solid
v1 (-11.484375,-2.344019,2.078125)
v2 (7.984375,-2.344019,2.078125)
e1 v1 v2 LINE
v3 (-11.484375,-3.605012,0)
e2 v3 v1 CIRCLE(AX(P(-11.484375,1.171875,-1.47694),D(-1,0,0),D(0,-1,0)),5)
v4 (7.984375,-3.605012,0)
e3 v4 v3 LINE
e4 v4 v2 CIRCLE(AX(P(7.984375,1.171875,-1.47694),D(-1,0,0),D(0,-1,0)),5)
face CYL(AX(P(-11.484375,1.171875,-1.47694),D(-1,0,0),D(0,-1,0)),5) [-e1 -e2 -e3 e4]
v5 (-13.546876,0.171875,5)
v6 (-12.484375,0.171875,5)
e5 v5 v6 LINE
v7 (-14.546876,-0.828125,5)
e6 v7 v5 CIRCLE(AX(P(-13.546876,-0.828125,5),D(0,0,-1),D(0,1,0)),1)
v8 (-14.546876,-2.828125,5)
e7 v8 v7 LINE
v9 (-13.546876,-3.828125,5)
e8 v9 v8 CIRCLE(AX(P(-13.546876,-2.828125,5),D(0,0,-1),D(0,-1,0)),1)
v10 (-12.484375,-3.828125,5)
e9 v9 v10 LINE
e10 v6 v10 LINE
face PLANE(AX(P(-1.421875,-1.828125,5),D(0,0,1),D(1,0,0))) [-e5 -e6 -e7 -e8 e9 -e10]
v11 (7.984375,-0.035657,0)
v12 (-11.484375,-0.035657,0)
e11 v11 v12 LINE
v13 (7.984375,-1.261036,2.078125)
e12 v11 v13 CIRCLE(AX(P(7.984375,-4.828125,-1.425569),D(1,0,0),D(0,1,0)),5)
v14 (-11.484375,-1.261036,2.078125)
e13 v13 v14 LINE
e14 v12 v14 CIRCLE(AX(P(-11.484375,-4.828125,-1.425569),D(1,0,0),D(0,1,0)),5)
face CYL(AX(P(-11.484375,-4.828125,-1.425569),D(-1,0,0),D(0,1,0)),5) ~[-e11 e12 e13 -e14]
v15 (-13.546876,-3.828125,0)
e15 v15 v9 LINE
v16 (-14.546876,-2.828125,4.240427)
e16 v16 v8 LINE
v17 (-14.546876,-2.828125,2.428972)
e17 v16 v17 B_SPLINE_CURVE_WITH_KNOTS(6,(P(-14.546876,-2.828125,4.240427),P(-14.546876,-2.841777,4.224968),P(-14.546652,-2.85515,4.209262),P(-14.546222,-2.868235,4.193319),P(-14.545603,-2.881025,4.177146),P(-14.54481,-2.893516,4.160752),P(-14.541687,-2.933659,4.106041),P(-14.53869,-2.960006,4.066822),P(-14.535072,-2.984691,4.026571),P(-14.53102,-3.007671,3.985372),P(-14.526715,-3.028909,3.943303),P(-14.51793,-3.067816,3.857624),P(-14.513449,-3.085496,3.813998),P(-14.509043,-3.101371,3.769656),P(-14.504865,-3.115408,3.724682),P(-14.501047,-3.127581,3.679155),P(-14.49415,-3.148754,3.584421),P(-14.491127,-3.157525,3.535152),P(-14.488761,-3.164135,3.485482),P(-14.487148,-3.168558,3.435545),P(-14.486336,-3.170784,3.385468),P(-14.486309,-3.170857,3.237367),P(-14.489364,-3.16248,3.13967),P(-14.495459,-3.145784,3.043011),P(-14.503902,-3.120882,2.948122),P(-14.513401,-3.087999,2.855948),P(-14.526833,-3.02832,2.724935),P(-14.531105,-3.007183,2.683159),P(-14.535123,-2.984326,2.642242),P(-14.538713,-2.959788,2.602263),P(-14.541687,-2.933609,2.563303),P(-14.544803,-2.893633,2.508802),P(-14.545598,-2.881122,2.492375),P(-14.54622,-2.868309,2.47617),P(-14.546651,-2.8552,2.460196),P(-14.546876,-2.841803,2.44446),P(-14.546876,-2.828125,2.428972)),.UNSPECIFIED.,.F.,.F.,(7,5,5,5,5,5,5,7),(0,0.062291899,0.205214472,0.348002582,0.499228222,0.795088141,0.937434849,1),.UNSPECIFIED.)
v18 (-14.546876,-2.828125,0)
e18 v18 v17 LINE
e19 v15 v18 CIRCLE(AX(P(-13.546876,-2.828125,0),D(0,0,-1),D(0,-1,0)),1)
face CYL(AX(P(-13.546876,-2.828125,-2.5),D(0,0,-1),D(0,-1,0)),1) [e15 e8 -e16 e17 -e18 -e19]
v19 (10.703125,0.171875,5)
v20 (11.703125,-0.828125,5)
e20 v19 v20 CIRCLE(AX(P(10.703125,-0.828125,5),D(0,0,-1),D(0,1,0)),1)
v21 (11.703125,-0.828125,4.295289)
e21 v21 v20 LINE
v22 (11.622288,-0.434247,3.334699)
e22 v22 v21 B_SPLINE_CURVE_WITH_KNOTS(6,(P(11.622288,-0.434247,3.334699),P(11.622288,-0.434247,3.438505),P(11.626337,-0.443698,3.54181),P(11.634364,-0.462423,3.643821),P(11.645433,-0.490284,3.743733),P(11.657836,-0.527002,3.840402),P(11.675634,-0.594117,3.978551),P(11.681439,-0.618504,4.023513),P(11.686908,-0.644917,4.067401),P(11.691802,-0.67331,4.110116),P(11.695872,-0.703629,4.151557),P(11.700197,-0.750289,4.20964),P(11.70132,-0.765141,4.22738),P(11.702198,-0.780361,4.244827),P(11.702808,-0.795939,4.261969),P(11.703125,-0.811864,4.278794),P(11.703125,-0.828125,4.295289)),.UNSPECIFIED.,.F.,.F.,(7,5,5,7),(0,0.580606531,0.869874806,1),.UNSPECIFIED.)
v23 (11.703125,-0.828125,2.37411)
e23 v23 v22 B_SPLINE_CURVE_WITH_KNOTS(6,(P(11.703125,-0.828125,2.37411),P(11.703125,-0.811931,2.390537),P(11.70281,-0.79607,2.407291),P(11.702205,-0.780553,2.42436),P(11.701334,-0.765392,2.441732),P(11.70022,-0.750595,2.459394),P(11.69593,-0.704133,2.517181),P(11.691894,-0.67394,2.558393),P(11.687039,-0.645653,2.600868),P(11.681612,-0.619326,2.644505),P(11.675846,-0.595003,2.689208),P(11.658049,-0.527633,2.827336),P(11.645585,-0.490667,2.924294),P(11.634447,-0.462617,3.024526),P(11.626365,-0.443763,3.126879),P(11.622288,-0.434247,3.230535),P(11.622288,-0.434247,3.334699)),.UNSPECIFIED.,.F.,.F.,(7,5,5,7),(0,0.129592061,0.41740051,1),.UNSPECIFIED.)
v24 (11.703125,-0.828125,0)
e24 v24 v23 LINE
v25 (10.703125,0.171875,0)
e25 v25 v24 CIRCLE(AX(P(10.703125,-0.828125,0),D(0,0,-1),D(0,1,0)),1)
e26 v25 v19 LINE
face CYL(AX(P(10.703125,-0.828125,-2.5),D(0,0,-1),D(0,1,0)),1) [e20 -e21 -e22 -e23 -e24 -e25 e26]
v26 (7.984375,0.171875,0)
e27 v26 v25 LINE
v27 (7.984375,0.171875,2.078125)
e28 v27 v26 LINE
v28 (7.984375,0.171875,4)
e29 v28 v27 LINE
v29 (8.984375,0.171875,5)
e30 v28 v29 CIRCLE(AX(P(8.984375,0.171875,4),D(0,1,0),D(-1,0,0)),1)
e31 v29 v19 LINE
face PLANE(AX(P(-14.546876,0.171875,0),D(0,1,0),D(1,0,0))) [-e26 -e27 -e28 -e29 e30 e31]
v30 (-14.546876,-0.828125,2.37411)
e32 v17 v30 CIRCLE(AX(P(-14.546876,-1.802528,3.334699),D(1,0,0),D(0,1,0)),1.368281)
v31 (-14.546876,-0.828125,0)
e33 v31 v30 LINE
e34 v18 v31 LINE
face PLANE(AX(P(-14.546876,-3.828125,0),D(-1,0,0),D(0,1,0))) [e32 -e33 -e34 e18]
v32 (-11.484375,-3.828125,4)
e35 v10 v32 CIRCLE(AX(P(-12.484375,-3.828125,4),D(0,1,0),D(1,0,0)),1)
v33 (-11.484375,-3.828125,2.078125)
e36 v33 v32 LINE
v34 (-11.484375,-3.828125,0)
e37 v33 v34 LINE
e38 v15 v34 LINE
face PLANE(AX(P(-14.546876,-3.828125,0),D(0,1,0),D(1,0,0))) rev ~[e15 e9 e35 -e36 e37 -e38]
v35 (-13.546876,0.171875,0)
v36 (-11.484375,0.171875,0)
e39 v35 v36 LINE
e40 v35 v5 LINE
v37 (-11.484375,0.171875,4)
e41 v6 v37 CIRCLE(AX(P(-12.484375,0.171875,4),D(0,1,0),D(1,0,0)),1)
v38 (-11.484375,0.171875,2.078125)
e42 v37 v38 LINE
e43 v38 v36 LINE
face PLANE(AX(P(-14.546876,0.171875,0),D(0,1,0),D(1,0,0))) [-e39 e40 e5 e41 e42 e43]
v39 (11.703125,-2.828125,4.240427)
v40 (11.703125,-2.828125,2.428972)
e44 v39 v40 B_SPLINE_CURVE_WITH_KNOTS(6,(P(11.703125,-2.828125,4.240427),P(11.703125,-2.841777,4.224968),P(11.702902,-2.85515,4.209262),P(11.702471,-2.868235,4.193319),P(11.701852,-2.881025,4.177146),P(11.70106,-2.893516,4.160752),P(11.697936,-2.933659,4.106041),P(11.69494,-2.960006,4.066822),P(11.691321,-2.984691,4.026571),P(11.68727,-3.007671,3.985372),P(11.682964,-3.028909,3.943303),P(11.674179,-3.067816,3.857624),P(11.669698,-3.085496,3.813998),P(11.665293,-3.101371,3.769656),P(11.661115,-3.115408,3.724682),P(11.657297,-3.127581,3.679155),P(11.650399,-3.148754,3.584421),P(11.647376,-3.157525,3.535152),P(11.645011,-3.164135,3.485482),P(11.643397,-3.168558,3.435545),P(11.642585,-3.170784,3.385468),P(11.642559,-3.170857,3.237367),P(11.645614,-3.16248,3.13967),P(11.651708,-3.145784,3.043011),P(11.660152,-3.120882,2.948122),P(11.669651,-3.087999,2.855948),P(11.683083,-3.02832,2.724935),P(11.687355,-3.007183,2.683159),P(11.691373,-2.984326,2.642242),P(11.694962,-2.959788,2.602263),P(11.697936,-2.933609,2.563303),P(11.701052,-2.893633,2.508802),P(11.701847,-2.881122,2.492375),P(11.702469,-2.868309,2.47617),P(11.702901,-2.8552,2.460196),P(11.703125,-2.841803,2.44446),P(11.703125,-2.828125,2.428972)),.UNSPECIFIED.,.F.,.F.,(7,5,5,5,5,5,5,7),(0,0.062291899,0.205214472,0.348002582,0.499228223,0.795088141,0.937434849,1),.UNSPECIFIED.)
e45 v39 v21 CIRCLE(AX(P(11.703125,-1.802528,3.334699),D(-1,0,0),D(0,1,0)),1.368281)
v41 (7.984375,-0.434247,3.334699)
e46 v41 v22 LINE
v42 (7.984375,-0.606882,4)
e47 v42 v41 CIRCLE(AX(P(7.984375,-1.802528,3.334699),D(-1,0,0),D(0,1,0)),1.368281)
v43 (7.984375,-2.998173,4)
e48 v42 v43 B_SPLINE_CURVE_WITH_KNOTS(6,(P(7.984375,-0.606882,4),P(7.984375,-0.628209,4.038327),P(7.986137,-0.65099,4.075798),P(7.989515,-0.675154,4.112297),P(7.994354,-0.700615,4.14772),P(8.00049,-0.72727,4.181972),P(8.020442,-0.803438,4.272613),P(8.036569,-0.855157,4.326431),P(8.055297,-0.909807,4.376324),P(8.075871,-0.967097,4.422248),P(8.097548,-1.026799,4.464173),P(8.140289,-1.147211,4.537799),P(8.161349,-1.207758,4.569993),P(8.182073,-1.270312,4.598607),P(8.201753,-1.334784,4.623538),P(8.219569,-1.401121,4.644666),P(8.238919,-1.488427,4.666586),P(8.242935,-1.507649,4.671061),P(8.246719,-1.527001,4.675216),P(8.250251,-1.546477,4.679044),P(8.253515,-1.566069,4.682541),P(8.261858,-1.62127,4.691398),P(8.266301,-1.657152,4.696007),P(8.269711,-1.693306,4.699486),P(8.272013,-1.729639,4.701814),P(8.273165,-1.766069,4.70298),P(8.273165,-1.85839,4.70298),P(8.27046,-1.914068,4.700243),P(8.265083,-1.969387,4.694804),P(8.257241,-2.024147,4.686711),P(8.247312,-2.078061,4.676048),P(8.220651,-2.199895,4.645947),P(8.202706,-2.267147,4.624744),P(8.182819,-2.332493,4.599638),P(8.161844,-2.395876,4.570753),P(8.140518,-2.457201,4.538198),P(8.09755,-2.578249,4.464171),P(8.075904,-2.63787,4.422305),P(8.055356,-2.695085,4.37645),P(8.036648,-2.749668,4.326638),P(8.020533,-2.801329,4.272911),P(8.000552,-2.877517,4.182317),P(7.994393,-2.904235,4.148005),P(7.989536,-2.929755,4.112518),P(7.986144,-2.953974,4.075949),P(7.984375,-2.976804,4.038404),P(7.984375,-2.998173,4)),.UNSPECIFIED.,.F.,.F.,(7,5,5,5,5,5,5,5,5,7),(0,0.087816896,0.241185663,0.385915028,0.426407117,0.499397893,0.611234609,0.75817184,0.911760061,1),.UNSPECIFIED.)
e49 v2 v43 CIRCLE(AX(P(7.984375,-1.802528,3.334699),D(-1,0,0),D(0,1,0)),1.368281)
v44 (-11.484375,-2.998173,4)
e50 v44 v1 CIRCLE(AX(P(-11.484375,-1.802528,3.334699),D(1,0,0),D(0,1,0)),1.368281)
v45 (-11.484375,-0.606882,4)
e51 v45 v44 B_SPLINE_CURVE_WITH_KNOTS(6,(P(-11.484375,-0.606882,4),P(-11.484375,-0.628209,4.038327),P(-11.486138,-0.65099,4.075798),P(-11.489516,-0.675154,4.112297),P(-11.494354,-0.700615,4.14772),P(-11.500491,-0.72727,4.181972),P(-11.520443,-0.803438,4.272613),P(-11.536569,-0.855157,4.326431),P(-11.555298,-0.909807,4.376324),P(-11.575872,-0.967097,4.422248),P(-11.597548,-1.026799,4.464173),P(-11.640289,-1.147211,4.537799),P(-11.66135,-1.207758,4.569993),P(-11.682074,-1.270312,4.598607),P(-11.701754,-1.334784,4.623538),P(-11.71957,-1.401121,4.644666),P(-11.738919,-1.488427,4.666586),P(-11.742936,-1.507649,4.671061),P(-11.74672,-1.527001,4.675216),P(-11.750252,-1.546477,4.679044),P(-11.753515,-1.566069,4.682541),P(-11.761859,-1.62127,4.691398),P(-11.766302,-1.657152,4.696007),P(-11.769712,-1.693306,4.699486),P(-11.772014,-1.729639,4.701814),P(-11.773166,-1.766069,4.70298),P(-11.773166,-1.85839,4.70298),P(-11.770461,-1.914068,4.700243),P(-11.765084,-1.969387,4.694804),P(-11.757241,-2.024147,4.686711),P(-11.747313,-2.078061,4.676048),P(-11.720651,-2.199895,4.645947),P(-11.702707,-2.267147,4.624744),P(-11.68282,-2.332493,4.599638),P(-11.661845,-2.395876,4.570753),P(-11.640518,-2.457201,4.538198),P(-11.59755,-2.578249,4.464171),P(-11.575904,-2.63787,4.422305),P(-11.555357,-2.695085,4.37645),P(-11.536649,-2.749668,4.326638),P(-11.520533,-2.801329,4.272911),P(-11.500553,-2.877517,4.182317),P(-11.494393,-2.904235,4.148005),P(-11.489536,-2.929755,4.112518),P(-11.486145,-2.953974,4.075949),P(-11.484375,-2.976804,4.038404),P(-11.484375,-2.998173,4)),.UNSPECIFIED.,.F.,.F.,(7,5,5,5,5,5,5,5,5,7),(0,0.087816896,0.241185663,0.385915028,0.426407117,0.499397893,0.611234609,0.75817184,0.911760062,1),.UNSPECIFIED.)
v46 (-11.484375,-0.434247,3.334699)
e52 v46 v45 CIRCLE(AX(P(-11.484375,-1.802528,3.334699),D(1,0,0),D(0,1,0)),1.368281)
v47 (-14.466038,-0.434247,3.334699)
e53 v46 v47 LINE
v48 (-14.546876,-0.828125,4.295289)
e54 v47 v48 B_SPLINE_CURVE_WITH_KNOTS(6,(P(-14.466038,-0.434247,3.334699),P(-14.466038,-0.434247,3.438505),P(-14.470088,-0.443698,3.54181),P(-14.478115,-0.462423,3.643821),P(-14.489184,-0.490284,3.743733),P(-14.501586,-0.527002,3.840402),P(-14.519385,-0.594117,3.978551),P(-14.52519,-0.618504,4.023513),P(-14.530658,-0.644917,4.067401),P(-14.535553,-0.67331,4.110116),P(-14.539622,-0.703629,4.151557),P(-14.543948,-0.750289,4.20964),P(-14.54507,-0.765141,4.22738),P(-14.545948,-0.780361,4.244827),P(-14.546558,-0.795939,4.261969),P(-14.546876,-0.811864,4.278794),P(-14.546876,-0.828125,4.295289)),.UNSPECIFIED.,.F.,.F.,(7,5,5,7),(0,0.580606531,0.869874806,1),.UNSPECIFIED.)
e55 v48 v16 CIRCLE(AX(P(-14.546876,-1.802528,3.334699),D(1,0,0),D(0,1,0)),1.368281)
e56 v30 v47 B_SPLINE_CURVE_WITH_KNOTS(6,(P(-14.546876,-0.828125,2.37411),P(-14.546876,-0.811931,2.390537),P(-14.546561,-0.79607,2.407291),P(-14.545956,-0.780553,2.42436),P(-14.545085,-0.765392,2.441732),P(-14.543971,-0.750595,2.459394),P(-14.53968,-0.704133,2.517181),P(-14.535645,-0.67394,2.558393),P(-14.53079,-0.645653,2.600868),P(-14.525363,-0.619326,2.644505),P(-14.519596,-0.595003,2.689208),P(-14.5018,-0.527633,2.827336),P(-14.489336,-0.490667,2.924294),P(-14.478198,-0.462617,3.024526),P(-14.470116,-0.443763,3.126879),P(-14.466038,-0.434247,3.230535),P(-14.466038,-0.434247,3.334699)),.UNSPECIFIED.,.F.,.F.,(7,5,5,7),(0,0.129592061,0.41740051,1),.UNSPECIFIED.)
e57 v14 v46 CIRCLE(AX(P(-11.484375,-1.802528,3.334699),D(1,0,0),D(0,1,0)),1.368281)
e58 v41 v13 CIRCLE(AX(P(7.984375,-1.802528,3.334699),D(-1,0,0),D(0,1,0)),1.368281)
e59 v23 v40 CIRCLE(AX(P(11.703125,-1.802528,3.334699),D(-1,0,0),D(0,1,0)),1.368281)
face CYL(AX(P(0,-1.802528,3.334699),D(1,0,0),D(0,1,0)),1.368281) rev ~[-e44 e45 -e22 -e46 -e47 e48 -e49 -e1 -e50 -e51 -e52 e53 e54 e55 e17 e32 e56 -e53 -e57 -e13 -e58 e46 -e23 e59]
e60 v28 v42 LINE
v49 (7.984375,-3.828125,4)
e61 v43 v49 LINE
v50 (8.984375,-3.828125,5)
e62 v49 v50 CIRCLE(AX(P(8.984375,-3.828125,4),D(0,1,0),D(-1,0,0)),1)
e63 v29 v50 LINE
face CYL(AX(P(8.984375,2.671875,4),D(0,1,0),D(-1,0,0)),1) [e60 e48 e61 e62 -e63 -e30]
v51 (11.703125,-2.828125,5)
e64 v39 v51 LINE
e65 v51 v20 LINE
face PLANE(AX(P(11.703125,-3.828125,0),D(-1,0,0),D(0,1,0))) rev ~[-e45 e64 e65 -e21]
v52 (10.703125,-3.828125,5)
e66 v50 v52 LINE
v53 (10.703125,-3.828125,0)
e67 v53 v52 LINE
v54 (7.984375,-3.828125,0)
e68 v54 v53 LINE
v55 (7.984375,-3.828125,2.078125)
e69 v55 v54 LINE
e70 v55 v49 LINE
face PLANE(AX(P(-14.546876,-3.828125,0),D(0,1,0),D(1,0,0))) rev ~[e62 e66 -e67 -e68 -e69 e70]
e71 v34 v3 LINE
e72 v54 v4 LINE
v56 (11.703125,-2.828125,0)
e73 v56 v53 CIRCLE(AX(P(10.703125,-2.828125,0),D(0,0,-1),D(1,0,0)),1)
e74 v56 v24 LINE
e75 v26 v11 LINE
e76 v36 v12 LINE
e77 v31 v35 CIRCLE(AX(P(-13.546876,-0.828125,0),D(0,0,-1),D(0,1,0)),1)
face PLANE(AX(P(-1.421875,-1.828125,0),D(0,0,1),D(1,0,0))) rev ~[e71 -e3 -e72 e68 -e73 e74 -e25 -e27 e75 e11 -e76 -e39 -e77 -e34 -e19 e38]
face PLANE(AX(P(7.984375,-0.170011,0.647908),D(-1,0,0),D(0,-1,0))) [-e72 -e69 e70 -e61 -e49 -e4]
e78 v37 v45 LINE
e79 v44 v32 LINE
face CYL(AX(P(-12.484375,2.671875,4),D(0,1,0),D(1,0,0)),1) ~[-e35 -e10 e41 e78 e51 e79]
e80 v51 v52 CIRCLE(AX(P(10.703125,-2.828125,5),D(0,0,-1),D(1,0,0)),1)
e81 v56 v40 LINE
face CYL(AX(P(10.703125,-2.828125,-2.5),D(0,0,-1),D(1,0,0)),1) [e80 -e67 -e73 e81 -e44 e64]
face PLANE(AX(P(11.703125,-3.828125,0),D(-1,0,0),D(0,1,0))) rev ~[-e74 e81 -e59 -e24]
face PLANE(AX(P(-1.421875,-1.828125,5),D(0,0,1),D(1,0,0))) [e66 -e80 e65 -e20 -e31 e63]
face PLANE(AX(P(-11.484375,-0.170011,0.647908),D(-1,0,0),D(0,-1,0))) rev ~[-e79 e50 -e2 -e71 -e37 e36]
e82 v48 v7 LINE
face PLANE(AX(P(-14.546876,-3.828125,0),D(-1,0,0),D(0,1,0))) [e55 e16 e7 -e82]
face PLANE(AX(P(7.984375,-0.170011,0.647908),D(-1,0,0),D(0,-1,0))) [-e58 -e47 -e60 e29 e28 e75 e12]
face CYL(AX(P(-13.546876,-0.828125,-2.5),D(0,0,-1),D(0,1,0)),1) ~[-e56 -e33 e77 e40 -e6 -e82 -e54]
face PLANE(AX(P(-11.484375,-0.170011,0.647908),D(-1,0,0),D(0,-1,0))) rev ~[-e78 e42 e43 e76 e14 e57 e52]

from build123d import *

# Parameters (mm, degrees)
F0_W         = 26.2500010431
F0_H         = 4
F1_DEPTH     = 5
F2_W         = 19.4687498733
F2_H         = 4.5937502291
F3_DEPTH     = 43.3
F4_DEPTH     = 52.6
F5_R         = 1.3682808459
F6_DEPTH     = 25
F7_DEPTH     = 21.1
F8_T1_DEPTH  = 10
F9_T1_DEPTH  = 10
F10_T1_DEPTH = 10
F11_T1_DEPTH = 19.4687498733
F12_T1_DEPTH = 9


# Not quite as in the source:
# - a fillet or chamfer that OpenCascade refuses, or shapes differently, is made with other operations: its cross-section is extruded or revolved along the edge and cut away or added


with BuildPart() as f1:
    # F0 (on Top) → F1 (new body)
    with BuildSketch(Plane.XY):
        with Locations((-1.4218753204, -1.8281253073)):
            Rectangle(F0_W, F0_H)
    extrude(amount=F1_DEPTH)

    # F2 (on Front) → F3 (cut)
    with BuildSketch(Plane.XZ):
        with Locations((-1.7500002868, 4.375000135)):
            Rectangle(F2_W, F2_H)
    extrude(amount=F3_DEPTH, mode=Mode.SUBTRACT)

    # F2 (on Front) → F4 (cut)
    with BuildSketch(Plane.XZ):
        with Locations((-1.7500002868, 4.375000135)):
            Rectangle(F2_W, F2_H)
    extrude(amount=-F4_DEPTH, mode=Mode.SUBTRACT)

    # F5 (on Right) → F6 (cut)
    with BuildSketch(Plane.YZ):
        with Locations((-1.802527695, 3.3346994314)):
            Circle(F5_R)
    extrude(amount=-F6_DEPTH, mode=Mode.SUBTRACT)

    # F5 (on Right) → F7 (cut)
    with BuildSketch(Plane.YZ):
        with Locations((-1.802527695, 3.3346994314)):
            Circle(F5_R)
    extrude(amount=F7_DEPTH, mode=Mode.SUBTRACT)

    # F8: fillet of radius 1 on 1 edges, made by hand

    # F8_s2 → F8_t1 (cut)
    with BuildSketch(Plane.XY.offset(-2.5)):
        with BuildLine():
            ThreePointArc((10.7031252012, 0.1718746927), (11.4102319824, -0.1210185261), (11.7031252012, -0.8281253073))
            Line((11.7031252012, -0.8281253073), (11.7031252012, 0.1718746927))
            Line((11.7031252012, 0.1718746927), (10.7031252012, 0.1718746927))
        make_face()
    extrude(amount=F8_T1_DEPTH, mode=Mode.SUBTRACT)

    # F9: fillet of radius 1 on 1 edges, made by hand

    # F9_s2 → F9_t1 (cut)
    with BuildSketch(Plane.XY.offset(-2.5)):
        with BuildLine():
            ThreePointArc((-13.5468758419, 0.1718746927), (-14.2539826231, -0.1210185261), (-14.5468758419, -0.8281253073))
            Line((-14.5468758419, -0.8281253073), (-14.5468758419, 0.1718746927))
            Line((-14.5468758419, 0.1718746927), (-13.5468758419, 0.1718746927))
        make_face()
    extrude(amount=F9_T1_DEPTH, mode=Mode.SUBTRACT)

    # F10: fillet of radius 1 on 2 edges, made by hand

    # F10_s2 → F10_t1 (cut)
    with BuildSketch(Plane.XY.offset(-2.5)):
        with BuildLine():
            ThreePointArc((11.7031252012, -2.8281253073), (11.4102319824, -3.5352320885), (10.7031252012, -3.8281253073))
            Line((10.7031252012, -3.8281253073), (11.7031252012, -3.8281253073))
            Line((11.7031252012, -3.8281253073), (11.7031252012, -2.8281253073))
        make_face()
        with BuildLine():
            ThreePointArc((-13.5468758419, -3.8281253073), (-14.2539826231, -3.5352320885), (-14.5468758419, -2.8281253073))
            Line((-14.5468758419, -2.8281253073), (-14.5468758419, -3.8281253073))
            Line((-14.5468758419, -3.8281253073), (-13.5468758419, -3.8281253073))
        make_face()
    extrude(amount=F10_T1_DEPTH, mode=Mode.SUBTRACT)

    # F11: fillet of radius 5 on 2 edges, made by hand

    # F11_s2 → F11_t1 (cut)
    with BuildSketch(Plane.YZ.offset(-11.4843752235)):
        with BuildLine():
            ThreePointArc((0.1718746927, -1.4255693283), (-0.2001967002, 0.467121034), (-1.2610360303, 2.0781250205))
            Line((-1.2610360303, 2.0781250205), (0.1718746927, 2.0781250205))
            Line((0.1718746927, 2.0781250205), (0.1718746927, -1.4255693283))
        make_face()
        with BuildLine():
            ThreePointArc((-3.8281253073, -1.4769402409), (-3.4422054032, 0.4492645429), (-2.3440193596, 2.0781250205))
            Line((-2.3440193596, 2.0781250205), (-3.8281253073, 2.0781250205))
            Line((-3.8281253073, 2.0781250205), (-3.8281253073, -1.4769402409))
        make_face()
    extrude(amount=F11_T1_DEPTH, mode=Mode.SUBTRACT)

    # F12: fillet of radius 1 on 2 edges, made by hand

    # F12_s2 → F12_t1 (cut)
    with BuildSketch(Plane.XZ.offset(-2.6718746927)):
        with BuildLine():
            ThreePointArc((7.9843746498, 4), (8.2772678686, 4.7071067812), (8.9843746498, 5))
            Line((8.9843746498, 5), (7.9843746498, 5))
            Line((7.9843746498, 5), (7.9843746498, 4))
        make_face()
        with BuildLine():
            ThreePointArc((-11.4843752235, 4), (-11.7772684423, 4.7071067812), (-12.4843752235, 5))
            Line((-12.4843752235, 5), (-11.4843752235, 5))
            Line((-11.4843752235, 5), (-11.4843752235, 4))
        make_face()
    extrude(amount=F12_T1_DEPTH, mode=Mode.SUBTRACT)


solid = f1.part
